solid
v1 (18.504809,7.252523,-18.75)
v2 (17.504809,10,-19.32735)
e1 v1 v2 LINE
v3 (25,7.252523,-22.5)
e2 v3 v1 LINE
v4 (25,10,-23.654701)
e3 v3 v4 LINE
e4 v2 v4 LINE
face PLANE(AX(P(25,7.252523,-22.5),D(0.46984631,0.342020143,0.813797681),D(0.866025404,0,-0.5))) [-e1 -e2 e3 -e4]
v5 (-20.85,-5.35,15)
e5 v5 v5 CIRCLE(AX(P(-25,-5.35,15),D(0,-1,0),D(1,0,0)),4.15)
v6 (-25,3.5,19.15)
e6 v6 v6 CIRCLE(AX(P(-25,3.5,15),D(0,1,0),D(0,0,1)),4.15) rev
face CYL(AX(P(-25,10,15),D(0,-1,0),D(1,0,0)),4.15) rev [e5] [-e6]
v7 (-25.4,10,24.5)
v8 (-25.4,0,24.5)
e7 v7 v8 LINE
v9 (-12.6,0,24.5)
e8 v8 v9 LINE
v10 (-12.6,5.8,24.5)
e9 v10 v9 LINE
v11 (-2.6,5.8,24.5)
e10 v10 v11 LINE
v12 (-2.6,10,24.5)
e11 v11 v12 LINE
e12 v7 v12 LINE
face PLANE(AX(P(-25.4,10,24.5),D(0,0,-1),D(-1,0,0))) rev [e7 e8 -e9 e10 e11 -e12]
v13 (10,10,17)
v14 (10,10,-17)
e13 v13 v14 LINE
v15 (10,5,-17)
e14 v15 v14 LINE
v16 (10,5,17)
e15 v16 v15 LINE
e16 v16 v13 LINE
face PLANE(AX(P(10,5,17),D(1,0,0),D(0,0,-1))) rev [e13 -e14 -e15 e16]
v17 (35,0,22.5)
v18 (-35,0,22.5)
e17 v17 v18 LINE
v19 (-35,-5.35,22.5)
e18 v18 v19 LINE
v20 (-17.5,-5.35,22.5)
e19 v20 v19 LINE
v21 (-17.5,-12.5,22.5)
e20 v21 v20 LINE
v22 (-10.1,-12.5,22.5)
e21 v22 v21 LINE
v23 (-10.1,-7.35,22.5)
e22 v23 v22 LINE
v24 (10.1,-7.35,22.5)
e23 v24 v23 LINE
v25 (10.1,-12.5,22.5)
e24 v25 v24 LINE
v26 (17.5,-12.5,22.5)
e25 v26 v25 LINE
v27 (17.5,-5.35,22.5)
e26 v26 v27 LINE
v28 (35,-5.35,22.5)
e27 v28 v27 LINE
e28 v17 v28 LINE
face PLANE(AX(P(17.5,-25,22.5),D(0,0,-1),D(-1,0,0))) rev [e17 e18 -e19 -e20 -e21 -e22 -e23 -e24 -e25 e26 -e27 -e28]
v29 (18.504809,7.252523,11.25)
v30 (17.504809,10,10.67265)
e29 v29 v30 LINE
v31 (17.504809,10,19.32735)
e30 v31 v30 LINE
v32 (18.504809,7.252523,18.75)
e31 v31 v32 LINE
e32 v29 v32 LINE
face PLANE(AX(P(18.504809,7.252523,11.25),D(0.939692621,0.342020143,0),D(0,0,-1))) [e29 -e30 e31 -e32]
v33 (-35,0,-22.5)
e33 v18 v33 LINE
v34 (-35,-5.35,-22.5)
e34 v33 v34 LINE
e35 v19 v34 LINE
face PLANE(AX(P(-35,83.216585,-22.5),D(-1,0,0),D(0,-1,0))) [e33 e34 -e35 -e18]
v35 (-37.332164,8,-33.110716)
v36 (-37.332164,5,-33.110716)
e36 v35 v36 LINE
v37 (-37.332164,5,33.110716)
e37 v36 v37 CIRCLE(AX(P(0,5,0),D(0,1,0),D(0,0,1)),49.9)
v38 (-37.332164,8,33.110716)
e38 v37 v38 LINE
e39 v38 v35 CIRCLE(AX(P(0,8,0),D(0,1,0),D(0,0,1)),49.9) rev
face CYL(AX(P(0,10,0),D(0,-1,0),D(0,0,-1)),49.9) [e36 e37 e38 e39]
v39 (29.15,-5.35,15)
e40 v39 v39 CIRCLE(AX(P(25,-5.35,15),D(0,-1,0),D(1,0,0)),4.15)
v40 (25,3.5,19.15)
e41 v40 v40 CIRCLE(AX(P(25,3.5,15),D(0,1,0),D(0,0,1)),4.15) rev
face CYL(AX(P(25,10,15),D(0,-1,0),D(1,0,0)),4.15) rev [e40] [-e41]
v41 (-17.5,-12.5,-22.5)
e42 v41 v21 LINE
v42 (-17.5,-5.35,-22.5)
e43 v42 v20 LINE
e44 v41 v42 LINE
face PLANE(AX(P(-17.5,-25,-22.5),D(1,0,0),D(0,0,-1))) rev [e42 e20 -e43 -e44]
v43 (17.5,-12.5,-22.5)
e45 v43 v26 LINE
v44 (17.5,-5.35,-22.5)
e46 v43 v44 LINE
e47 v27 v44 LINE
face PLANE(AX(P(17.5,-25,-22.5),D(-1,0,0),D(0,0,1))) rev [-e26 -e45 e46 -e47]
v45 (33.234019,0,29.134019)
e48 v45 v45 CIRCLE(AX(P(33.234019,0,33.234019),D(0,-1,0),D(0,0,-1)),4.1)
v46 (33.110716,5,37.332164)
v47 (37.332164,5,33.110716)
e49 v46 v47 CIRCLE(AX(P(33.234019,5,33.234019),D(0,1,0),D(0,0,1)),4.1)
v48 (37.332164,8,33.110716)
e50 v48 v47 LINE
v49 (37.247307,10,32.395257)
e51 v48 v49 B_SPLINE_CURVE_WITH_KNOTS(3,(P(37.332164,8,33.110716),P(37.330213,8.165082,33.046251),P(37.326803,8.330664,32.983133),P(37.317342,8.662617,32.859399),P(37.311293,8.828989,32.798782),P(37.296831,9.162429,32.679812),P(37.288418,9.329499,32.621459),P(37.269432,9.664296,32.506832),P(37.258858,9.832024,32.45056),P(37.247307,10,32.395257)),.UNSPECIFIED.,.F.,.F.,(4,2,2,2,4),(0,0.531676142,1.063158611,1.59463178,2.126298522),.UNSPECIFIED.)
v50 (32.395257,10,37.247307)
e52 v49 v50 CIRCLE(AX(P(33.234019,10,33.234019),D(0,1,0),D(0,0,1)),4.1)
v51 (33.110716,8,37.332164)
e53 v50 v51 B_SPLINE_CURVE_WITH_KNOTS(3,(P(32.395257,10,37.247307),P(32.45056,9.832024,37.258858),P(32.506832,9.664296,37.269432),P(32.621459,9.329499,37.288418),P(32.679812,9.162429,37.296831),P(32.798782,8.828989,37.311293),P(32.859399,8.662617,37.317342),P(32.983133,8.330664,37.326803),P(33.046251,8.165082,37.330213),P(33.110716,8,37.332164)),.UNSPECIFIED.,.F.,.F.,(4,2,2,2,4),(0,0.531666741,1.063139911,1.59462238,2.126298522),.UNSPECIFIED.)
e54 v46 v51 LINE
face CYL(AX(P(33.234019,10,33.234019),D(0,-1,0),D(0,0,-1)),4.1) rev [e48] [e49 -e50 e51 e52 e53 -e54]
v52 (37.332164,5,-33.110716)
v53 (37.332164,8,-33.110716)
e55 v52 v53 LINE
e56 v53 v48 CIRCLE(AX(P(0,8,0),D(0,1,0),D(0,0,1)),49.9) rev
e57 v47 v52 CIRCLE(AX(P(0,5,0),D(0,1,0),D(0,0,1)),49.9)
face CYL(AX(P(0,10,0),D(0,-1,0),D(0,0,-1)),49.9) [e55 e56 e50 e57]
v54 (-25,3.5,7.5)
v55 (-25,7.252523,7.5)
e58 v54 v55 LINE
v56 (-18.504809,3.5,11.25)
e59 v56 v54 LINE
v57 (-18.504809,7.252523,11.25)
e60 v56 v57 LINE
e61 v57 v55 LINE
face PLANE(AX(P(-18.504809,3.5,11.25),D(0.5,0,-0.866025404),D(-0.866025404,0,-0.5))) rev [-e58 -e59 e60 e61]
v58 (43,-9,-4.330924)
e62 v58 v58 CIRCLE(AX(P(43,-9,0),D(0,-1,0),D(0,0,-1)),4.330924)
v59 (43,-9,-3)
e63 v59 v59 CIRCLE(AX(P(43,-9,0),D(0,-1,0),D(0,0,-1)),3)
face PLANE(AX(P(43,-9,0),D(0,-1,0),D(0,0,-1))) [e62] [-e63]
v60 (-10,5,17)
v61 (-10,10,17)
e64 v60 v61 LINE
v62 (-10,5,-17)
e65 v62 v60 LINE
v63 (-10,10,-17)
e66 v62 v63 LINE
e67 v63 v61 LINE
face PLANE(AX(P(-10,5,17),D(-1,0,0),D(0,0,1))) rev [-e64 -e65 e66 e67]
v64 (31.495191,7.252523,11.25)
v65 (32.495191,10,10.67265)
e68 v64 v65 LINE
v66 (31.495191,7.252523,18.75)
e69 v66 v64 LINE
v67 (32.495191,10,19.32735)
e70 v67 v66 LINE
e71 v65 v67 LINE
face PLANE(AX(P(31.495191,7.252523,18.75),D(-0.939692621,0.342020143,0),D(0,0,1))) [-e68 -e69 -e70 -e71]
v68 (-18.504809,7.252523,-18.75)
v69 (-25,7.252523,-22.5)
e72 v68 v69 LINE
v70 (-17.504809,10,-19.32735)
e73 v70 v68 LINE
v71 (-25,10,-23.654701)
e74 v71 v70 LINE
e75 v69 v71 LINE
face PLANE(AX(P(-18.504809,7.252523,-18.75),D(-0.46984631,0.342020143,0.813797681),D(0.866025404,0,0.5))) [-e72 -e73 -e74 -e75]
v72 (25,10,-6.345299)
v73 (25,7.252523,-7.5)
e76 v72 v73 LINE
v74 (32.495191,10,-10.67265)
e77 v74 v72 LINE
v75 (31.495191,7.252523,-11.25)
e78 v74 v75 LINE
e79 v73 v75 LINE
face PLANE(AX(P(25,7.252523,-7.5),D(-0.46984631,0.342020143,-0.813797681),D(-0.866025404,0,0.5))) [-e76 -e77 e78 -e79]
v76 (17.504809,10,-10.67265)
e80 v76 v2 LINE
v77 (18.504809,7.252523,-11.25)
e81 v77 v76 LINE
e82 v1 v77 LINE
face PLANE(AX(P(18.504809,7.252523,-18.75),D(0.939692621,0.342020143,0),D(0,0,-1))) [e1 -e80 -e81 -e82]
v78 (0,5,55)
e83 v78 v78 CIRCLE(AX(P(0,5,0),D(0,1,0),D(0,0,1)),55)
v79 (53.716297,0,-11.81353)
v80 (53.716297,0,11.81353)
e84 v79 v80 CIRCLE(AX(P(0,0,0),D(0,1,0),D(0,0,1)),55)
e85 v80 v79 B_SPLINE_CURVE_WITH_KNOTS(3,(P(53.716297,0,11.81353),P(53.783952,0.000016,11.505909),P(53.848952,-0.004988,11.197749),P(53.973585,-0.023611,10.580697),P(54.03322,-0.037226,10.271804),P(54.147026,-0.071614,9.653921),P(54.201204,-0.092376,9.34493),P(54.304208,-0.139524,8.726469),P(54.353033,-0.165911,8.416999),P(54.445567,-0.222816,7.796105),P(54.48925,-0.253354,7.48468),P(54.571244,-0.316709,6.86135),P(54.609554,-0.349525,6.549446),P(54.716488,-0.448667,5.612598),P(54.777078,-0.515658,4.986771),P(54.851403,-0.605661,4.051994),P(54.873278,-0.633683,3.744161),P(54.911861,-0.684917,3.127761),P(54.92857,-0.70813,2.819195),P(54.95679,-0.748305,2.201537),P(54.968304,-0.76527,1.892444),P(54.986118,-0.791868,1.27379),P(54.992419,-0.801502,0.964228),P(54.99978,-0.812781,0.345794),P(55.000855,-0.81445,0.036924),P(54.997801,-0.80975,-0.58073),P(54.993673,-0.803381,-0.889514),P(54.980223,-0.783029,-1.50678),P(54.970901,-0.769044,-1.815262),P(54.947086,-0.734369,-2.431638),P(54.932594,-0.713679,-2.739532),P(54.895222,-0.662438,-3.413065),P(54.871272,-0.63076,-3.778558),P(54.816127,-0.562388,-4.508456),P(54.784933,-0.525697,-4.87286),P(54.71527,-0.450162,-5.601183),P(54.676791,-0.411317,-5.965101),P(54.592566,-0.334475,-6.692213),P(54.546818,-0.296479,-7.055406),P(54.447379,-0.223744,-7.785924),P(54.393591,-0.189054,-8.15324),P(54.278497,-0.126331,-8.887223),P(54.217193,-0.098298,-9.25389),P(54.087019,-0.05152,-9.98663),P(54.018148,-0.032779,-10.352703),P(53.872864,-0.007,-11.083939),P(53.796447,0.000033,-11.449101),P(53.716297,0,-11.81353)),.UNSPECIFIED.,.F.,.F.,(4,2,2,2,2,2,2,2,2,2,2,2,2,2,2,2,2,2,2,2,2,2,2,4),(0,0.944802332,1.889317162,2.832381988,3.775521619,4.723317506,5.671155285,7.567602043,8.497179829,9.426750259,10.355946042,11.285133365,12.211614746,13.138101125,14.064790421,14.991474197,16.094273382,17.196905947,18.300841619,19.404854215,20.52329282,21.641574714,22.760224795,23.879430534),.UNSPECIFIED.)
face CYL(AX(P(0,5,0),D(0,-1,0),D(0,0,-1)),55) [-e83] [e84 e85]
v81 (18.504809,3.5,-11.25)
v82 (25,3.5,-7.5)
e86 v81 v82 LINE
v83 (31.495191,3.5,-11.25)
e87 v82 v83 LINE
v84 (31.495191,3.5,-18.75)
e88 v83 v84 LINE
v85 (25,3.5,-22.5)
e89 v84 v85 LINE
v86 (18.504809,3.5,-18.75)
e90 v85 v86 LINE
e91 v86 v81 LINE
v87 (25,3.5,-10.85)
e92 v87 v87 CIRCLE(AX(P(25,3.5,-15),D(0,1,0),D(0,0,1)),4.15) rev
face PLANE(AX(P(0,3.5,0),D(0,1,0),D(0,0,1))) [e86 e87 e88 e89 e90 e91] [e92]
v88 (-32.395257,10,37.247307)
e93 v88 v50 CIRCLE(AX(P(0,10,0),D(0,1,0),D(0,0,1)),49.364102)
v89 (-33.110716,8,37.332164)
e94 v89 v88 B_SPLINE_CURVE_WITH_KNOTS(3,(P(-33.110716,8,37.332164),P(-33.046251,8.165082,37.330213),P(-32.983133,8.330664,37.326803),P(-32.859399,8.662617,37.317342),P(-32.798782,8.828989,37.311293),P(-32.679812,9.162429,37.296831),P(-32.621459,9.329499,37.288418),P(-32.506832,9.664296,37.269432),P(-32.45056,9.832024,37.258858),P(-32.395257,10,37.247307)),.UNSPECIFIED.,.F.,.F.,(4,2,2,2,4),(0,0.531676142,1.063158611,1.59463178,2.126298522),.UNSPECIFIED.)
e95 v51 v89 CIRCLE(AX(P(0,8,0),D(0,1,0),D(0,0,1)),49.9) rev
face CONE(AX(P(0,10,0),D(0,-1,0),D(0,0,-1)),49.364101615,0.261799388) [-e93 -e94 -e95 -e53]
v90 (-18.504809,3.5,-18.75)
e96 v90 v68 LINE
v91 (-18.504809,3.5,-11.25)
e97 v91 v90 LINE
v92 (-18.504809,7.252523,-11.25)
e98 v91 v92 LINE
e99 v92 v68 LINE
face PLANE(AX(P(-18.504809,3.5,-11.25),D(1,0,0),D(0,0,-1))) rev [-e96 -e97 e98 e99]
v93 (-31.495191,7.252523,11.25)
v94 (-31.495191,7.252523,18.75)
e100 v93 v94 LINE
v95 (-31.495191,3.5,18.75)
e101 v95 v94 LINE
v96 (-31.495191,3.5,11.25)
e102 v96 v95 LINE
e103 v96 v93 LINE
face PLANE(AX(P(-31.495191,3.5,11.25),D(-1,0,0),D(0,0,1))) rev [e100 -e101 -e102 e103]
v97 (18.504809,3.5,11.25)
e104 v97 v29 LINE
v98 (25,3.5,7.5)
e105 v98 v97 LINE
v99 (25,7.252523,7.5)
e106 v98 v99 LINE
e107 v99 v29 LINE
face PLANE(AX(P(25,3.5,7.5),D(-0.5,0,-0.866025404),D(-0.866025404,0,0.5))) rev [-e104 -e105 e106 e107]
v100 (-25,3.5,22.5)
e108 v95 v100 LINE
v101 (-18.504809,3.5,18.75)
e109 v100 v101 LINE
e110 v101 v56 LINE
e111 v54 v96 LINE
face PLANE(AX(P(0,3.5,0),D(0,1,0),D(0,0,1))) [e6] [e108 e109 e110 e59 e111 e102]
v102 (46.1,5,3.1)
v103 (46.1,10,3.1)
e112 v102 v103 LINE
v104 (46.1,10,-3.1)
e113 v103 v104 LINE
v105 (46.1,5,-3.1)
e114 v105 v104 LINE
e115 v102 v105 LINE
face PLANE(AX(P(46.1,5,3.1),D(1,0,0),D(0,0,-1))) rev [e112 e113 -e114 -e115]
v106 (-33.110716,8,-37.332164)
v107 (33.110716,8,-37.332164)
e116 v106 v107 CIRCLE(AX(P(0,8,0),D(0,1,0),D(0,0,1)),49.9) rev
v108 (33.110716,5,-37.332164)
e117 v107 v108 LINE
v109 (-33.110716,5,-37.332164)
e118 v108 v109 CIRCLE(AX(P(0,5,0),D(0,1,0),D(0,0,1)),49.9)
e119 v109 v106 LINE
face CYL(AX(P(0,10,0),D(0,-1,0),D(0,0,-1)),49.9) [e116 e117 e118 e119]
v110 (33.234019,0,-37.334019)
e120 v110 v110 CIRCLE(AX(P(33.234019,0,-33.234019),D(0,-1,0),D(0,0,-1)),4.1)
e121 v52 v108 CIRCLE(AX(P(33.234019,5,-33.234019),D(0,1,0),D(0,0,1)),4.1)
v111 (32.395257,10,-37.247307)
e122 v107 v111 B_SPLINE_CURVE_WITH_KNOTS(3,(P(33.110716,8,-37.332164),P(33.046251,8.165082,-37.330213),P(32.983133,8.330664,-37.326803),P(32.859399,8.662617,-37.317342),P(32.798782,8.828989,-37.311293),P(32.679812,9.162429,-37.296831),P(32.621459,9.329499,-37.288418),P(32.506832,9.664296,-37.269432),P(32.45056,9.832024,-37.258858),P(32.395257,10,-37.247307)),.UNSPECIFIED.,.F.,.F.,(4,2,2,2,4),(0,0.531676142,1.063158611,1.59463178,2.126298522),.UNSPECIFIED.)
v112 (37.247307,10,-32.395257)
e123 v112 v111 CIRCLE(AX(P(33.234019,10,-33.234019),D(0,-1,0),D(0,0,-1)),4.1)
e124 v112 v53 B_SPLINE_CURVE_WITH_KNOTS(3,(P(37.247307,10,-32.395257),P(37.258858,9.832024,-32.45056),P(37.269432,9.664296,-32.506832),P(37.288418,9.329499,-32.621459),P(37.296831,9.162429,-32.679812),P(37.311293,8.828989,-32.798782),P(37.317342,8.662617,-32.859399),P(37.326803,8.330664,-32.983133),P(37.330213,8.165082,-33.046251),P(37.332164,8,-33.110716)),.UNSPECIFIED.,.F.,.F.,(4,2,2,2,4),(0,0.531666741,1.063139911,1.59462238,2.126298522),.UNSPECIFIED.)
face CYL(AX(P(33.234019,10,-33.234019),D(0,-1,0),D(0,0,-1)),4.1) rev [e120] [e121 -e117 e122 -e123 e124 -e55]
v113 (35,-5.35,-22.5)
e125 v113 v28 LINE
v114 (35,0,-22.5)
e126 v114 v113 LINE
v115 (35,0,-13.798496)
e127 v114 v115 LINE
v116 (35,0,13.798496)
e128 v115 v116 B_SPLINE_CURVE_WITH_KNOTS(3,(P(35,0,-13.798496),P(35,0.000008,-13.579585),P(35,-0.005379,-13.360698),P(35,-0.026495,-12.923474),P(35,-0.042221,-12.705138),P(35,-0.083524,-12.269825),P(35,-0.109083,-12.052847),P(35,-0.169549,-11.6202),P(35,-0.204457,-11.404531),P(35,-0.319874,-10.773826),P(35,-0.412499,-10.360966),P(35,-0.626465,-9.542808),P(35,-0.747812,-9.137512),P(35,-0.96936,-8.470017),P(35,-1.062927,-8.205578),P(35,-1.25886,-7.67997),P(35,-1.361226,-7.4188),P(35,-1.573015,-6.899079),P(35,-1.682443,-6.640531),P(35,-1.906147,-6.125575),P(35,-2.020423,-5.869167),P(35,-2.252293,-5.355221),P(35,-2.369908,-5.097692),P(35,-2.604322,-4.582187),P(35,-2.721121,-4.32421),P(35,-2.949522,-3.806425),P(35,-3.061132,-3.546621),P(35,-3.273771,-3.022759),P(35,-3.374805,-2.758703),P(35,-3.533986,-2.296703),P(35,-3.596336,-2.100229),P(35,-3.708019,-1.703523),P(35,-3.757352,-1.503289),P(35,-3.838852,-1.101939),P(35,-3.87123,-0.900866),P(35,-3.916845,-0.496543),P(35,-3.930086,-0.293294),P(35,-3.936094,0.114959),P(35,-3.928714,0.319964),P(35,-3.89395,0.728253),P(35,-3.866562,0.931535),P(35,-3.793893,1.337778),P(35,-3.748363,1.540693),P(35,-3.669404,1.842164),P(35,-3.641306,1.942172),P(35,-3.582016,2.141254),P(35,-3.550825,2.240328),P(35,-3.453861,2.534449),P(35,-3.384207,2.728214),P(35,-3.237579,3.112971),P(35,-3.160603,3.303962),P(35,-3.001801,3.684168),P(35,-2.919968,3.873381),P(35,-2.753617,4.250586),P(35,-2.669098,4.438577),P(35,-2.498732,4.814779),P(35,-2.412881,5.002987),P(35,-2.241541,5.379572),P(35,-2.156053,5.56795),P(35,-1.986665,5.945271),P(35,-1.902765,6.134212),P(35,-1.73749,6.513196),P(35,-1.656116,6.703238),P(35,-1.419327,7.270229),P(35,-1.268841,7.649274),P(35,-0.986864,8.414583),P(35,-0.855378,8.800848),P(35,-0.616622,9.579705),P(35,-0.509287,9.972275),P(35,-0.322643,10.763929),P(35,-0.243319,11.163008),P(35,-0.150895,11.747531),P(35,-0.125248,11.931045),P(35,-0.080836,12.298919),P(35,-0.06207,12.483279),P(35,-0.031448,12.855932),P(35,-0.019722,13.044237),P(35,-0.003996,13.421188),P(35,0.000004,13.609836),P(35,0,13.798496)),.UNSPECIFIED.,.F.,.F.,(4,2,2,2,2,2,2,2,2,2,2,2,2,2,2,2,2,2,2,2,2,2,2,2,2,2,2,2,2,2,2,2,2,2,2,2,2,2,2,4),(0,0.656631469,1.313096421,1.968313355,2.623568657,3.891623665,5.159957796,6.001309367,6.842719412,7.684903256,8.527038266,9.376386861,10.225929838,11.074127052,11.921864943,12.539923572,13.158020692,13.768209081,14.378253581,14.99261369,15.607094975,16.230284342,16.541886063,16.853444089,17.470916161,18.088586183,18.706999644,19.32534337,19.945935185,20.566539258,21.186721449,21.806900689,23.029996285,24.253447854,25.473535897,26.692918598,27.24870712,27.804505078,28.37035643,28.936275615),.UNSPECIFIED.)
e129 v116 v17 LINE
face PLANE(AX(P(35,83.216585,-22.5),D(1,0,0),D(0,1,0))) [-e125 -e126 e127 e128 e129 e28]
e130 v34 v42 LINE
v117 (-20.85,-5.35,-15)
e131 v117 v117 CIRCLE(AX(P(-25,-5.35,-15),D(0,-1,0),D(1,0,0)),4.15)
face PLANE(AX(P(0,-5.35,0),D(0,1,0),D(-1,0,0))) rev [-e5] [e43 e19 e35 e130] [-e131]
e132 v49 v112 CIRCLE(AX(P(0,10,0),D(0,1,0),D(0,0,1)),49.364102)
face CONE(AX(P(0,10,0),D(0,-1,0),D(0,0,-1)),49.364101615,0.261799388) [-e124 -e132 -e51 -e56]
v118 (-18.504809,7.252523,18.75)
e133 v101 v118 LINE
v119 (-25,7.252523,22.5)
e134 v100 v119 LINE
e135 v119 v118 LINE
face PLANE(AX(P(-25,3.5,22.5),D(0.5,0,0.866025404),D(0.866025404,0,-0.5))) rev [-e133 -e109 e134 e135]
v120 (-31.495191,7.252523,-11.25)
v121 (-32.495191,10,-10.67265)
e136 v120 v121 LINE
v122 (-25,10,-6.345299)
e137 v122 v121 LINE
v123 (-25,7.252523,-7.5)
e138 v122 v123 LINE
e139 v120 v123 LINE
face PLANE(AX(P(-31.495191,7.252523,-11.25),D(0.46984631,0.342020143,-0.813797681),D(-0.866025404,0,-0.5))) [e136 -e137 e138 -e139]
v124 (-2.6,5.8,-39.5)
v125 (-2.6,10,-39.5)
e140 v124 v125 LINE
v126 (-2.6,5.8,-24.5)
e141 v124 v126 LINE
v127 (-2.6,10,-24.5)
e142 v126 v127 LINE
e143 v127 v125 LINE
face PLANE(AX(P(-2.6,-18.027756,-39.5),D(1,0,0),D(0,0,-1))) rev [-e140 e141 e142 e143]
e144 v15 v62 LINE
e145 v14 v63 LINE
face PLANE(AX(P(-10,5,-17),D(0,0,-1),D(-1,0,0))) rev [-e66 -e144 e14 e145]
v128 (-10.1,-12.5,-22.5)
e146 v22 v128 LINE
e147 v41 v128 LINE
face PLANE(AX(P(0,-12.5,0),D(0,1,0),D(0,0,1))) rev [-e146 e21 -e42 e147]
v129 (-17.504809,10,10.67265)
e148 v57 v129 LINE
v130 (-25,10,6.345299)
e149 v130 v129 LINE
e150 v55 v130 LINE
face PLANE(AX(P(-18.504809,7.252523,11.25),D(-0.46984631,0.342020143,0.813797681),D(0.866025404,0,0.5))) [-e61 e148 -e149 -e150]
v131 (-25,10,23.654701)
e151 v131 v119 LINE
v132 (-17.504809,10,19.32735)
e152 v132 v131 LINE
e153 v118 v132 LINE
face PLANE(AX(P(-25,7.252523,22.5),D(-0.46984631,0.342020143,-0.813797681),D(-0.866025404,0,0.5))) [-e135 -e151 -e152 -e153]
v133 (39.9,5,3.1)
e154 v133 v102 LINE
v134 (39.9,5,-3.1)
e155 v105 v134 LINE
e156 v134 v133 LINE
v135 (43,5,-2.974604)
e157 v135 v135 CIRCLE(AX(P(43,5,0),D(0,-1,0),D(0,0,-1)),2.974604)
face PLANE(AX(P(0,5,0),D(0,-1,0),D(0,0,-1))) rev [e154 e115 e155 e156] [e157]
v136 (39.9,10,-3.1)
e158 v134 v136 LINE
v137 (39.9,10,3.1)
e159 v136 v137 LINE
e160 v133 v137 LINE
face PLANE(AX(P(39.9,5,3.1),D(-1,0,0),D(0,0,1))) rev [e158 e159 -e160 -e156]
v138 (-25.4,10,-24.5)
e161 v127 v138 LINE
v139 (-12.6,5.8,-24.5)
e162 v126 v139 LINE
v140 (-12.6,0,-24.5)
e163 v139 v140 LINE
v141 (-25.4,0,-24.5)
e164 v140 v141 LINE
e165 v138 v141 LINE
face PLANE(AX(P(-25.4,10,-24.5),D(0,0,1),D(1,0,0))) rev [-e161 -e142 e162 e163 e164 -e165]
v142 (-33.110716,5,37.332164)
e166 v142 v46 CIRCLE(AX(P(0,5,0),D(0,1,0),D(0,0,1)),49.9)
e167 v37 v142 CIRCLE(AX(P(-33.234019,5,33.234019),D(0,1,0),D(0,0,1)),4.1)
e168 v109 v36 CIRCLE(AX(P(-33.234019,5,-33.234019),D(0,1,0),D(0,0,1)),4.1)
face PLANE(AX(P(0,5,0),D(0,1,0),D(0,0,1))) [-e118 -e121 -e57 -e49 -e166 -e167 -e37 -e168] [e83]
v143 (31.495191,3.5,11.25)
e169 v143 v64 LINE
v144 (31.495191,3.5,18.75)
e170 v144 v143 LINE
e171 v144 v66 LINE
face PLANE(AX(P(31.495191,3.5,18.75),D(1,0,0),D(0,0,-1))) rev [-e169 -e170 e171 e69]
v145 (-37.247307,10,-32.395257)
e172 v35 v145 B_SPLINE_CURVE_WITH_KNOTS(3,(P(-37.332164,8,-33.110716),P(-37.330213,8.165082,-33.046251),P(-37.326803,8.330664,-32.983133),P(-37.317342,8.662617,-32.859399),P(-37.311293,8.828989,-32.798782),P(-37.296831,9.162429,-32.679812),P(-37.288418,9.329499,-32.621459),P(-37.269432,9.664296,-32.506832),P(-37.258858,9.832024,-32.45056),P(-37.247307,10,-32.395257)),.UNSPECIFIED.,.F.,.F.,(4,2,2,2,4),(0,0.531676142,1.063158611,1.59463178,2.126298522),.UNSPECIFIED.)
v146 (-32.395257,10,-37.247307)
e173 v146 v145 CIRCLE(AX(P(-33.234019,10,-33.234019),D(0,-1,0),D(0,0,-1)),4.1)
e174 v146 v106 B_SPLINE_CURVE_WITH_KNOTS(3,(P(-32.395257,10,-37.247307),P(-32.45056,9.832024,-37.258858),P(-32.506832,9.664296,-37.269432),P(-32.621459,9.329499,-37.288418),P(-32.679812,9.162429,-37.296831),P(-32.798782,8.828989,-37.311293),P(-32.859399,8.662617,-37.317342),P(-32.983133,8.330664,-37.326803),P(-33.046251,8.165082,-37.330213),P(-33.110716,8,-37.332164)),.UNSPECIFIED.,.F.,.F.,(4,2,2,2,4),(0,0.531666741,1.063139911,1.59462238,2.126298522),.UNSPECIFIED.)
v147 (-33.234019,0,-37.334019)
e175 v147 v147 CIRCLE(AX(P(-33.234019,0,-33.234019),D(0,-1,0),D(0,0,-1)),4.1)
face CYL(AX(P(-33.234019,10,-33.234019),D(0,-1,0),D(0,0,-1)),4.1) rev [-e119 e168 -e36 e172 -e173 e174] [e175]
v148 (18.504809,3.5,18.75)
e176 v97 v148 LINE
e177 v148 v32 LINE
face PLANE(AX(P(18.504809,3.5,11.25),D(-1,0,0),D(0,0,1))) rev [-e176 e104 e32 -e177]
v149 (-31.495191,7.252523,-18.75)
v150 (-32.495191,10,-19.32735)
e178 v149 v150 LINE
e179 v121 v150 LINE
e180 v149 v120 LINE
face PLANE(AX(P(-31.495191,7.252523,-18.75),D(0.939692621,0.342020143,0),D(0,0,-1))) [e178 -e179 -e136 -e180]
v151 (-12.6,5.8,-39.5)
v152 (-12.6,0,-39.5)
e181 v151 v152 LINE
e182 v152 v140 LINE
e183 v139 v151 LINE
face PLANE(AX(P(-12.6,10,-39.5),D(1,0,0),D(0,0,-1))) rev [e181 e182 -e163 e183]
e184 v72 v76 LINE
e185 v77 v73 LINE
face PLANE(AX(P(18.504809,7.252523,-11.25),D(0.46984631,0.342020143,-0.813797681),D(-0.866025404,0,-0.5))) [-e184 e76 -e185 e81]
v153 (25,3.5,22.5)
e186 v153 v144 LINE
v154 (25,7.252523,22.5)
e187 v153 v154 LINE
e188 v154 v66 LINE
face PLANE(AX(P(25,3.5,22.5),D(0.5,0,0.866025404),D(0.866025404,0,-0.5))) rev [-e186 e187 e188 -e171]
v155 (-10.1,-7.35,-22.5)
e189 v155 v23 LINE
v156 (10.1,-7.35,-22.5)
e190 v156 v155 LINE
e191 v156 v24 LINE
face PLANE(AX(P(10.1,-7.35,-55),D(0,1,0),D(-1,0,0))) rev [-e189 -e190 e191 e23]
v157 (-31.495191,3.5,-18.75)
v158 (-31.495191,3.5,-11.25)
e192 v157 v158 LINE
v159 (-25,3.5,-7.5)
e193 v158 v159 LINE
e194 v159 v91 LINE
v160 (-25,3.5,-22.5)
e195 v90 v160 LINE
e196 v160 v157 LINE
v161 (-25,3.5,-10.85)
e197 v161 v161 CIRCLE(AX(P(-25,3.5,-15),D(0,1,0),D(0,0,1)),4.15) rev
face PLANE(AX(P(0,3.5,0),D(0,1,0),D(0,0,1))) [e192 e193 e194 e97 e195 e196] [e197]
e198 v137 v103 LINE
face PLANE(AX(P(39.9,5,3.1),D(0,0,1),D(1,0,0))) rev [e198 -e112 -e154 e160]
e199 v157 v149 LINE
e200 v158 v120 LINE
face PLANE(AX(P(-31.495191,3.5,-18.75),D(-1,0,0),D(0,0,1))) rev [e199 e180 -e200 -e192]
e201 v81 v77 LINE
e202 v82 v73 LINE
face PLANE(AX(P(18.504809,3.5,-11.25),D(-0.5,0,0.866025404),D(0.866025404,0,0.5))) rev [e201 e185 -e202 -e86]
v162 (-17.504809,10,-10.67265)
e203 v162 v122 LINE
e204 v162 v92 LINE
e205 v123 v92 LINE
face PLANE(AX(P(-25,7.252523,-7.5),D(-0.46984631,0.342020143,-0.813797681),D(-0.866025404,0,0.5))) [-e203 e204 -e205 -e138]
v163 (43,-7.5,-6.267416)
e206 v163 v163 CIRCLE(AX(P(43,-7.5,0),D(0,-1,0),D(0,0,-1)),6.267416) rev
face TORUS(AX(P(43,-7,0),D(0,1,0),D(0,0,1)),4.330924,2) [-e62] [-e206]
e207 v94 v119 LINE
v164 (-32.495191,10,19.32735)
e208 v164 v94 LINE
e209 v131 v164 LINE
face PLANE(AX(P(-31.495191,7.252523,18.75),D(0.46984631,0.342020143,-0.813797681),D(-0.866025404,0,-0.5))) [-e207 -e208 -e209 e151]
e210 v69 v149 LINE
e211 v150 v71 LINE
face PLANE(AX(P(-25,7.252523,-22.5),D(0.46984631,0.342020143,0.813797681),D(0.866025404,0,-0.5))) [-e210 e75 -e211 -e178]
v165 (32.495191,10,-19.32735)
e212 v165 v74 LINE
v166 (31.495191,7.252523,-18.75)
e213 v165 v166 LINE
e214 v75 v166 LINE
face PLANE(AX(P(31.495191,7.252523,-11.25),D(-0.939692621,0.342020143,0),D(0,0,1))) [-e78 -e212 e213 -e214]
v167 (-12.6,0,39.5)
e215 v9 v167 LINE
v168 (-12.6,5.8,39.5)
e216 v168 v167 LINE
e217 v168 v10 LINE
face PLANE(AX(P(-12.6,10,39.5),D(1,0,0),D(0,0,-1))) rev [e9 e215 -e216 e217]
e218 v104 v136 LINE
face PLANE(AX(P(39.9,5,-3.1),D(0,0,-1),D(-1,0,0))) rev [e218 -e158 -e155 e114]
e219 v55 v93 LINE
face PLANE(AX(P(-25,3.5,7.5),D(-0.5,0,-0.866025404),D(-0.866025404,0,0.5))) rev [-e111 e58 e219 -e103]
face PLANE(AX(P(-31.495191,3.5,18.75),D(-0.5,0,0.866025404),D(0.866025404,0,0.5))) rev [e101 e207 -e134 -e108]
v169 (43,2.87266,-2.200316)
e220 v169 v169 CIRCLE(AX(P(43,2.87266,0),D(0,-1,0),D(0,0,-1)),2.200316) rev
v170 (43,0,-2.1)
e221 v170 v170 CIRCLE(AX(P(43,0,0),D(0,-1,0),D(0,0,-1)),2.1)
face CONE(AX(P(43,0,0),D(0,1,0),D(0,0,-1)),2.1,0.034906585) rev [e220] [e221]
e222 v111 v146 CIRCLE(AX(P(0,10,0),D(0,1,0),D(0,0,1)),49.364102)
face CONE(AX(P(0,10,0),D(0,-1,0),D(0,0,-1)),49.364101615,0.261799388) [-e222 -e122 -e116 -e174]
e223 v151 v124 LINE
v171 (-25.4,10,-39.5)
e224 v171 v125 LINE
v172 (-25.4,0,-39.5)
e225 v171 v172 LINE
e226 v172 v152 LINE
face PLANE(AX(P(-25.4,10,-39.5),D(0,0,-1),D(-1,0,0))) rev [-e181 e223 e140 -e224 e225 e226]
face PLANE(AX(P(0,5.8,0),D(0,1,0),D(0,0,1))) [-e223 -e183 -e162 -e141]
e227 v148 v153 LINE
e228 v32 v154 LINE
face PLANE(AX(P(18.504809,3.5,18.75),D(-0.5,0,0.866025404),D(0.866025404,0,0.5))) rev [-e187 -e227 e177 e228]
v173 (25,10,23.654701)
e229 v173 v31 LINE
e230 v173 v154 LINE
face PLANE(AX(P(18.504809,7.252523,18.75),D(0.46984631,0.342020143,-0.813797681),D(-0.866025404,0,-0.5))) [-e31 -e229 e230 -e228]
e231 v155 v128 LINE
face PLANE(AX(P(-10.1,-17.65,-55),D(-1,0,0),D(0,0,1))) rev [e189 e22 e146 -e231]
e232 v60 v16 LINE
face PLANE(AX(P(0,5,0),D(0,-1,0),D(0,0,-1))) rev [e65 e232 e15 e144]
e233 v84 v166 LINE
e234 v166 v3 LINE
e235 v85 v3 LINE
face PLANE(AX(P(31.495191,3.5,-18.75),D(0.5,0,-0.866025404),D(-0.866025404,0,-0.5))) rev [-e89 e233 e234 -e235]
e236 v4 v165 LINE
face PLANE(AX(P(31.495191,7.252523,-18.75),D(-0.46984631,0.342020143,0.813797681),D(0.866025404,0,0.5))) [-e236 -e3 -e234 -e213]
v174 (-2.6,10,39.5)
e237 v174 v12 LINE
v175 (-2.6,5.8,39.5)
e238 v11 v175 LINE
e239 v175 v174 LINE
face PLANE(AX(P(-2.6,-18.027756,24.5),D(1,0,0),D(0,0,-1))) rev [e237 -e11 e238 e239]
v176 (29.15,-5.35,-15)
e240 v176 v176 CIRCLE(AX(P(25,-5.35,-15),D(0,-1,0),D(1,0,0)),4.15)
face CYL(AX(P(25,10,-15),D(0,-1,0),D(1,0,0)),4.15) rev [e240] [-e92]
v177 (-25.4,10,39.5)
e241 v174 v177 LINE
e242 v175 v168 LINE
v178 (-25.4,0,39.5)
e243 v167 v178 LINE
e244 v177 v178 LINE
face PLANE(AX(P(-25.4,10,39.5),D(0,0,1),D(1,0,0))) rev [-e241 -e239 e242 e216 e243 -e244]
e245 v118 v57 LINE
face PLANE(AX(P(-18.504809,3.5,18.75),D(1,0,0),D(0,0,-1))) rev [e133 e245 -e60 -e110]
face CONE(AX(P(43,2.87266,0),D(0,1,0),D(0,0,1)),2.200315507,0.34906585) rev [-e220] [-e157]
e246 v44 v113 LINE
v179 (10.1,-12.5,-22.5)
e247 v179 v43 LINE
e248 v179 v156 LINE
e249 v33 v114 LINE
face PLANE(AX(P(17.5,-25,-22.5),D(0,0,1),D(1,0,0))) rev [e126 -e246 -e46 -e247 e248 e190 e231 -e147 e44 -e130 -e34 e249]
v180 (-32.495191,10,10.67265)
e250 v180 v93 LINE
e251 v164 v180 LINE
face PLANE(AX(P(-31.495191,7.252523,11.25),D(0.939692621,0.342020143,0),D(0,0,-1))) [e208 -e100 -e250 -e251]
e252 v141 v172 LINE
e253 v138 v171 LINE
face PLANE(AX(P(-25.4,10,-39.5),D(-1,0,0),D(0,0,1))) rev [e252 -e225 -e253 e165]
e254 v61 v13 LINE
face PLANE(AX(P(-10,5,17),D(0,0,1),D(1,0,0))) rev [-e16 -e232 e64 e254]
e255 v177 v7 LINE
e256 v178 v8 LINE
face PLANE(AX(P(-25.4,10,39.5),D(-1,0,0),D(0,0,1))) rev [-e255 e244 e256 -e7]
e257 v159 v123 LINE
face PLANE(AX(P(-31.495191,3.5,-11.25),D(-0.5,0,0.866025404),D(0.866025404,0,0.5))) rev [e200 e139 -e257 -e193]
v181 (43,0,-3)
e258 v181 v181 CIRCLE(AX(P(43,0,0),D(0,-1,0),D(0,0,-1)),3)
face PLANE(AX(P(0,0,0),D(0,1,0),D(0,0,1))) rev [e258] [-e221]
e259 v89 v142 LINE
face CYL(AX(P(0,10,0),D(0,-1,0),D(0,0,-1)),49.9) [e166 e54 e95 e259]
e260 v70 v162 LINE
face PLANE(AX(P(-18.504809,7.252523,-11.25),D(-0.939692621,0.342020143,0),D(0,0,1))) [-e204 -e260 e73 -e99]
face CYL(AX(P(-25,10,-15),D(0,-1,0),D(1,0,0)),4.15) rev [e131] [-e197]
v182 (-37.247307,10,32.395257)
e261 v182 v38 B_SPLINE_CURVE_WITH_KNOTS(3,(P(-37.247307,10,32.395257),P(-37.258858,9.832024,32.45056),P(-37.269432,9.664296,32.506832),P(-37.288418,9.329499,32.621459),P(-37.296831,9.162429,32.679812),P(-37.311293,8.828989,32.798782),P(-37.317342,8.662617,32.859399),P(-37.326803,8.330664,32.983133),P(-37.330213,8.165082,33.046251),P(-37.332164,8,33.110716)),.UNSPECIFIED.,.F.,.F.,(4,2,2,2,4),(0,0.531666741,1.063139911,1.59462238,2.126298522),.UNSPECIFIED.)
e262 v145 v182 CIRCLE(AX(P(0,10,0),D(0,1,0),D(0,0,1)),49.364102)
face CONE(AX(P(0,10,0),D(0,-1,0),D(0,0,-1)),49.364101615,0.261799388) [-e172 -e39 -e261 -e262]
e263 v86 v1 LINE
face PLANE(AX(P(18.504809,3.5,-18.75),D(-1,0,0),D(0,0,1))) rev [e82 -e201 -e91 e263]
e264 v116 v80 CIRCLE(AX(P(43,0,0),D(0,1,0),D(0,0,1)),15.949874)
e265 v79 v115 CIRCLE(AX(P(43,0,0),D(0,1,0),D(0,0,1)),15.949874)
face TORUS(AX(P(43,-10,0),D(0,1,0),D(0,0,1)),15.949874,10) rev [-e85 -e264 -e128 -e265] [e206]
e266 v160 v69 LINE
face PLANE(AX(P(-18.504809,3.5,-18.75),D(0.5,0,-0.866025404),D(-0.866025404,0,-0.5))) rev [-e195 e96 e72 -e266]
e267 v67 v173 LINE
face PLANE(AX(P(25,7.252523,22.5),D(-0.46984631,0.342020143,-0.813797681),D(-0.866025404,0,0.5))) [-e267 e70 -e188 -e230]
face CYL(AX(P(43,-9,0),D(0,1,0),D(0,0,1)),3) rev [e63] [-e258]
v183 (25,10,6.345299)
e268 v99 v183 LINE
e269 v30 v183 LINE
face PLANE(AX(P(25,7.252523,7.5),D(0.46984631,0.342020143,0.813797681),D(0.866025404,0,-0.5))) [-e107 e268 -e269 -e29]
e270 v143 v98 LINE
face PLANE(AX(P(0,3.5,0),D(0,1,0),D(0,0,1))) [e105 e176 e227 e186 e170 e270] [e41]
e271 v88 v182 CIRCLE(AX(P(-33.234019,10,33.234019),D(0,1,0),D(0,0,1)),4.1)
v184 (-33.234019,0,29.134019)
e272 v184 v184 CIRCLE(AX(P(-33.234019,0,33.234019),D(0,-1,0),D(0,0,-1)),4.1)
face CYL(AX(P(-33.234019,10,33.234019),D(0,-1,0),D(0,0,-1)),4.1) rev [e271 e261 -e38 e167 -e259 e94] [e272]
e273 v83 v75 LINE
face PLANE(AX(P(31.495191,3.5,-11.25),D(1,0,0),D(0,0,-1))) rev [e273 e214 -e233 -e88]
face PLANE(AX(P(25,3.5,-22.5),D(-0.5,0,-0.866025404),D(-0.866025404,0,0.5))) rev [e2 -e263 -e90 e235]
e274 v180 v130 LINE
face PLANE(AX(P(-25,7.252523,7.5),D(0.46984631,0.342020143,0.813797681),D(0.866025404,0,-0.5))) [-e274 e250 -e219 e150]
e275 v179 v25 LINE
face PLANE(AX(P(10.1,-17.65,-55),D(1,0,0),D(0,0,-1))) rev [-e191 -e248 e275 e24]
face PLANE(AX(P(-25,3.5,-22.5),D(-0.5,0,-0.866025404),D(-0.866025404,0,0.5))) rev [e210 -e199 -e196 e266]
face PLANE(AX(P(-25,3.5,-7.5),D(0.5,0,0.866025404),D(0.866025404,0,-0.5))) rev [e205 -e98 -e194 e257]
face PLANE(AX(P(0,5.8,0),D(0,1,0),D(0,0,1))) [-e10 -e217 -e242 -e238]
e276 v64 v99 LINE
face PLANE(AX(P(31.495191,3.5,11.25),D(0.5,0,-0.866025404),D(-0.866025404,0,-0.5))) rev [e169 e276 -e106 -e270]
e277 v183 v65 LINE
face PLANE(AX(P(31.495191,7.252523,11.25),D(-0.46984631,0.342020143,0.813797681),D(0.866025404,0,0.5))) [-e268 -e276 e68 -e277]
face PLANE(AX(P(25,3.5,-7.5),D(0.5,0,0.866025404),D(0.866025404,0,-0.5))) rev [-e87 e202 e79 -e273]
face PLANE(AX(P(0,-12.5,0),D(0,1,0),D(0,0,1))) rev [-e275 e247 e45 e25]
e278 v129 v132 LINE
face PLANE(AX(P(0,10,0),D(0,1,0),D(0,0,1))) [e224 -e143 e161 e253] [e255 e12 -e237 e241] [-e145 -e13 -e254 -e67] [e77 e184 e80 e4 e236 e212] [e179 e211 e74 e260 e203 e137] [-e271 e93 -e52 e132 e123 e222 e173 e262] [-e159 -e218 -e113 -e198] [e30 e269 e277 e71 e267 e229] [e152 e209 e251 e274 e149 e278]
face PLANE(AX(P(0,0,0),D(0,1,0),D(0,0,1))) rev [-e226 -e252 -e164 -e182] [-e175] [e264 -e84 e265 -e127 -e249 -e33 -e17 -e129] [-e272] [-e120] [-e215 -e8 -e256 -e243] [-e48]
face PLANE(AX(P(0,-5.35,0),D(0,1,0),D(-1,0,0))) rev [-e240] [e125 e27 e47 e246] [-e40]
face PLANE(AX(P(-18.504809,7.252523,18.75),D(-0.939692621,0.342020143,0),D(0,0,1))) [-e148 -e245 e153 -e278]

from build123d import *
from OCP.BRepFilletAPI import BRepFilletAPI_MakeChamfer

# Parameters (mm, degrees)
SKETCH_1_R          = 55
EXTRUDE_1_DEPTH     = 5
SKETCH_2_R          = 49.9
EXTRUDE_2_DEPTH     = 5
SKETCH_3_W          = 35
SKETCH_3_H          = 45
EXTRUDE_3_DEPTH     = 25
SKETCH_4_W          = 20.2
SKETCH_4_H          = 10.3
CUT_EXTRUDE_1_DEPTH = 99.266220035
SKETCH_5_R          = 4.1
CUT_EXTRUDE_2_DEPTH = 82.700673192
SKETCH_6_R          = 2.75
CUT_EXTRUDE_3_DEPTH = 86.293610546
CHAMFER1_SIZE       = 2
CHAMFER1_SIZE2      = 0.535898385
SKETCH2_W           = 35.065209797
SKETCH2_H           = 45
CUT_EXTRUDE1_DEPTH  = 12.5
BOSS_EXTRUDE1_START = -2
SKETCH4_W           = 70
SKETCH4_H           = 45
BOSS_EXTRUDE1_DEPTH = 5.35
SKETCH5_R           = 4.15
CUT_EXTRUDE2_DEPTH  = 80.281917882
CUT_EXTRUDE3_DEPTH  = 6.5
SKETCH7_W           = 20
SKETCH7_H           = 34
CUT_EXTRUDE4_DEPTH  = 5
CHAMFER2_SIZE       = 1
CHAMFER2_SIZE2      = 2.747477419
SKETCH8_R           = 2.1
CUT_EXTRUDE5_DEPTH  = 79.779756283
CUT_EXTRUDE5_DRAFT  = 2
SKETCH9_W           = 6.2
SKETCH9_H           = 6.2
CUT_EXTRUDE6_DEPTH  = 5
CHAMFER3_SIZE       = 0.7
CHAMFER3_SIZE2      = 2.128636439
SKETCH10_R          = 6
SKETCH10_R_2        = 3
BOSS_EXTRUDE2_DEPTH = 9
FILLET1_R           = 10
FILLET2_R           = 2
SKETCH11_W          = 12.8
SKETCH11_H          = 15
CUT_EXTRUDE7_DEPTH  = 79.779756353
SKETCH13_W          = 10
SKETCH13_H          = 15
CUT_EXTRUDE8_DEPTH  = 4.2


with BuildPart() as part:
    # Эскиз1 → Бобышка-Вытянуть1 (new body)
    with BuildSketch(Plane(origin=(0, 0, 0), x_dir=(1, 0, 0), z_dir=(0, 1, 0))):
        with Locations(Location((0, 0, 0), (0, 0, 270))):
            Circle(SKETCH_1_R)
    extrude(amount=EXTRUDE_1_DEPTH)

    # Эскиз2 → Бобышка-Вытянуть2 (add)
    with BuildSketch(Plane(origin=(0, 5, 0), x_dir=(1, 0, 0), z_dir=(0, 1, 0))):
        with Locations(Location((0, 0, 0), (0, 0, 270))):
            Circle(SKETCH_2_R)
    extrude(amount=EXTRUDE_2_DEPTH)

    # Эскиз3 → Бобышка-Вытянуть3 (add)
    with BuildSketch(Plane.XZ):
        Rectangle(SKETCH_3_W, SKETCH_3_H)
    extrude(amount=EXTRUDE_3_DEPTH)

    # Эскиз4 → Вырез-Вытянуть1 (cut, through all)
    with BuildSketch(Plane.XY.offset(22.5)):
        with Locations((0, -12.5)):
            Rectangle(SKETCH_4_W, SKETCH_4_H)
    extrude(amount=-CUT_EXTRUDE_1_DEPTH, mode=Mode.SUBTRACT)

    # Эскиз5 → Вырез-Вытянуть2 (cut, through all)
    with BuildSketch(Plane.XZ):
        with Locations(Location((33.234018718, -33.234018718, 0), (0, 0, 270))):
            Circle(SKETCH_5_R)
        with Locations(Location((-33.234018718, -33.234018718, 0), (0, 0, 270))):
            Circle(SKETCH_5_R)
        with Locations(Location((-33.234018718, 33.234018718, 0), (0, 0, 270))):
            Circle(SKETCH_5_R)
        with Locations(Location((33.234018718, 33.234018718, 0), (0, 0, 270))):
            Circle(SKETCH_5_R)
    extrude(amount=-CUT_EXTRUDE_2_DEPTH, mode=Mode.SUBTRACT)

    # Эскиз6 → Вырез-Вытянуть3 (cut, through all)
    with BuildSketch(Plane(origin=(0, 10, 0), x_dir=(1, 0, 0), z_dir=(0, 1, 0))):
        with Locations(Location((-18, 28, 0), (0, 0, 270))):
            Circle(SKETCH_6_R)
    extrude(amount=-CUT_EXTRUDE_3_DEPTH, mode=Mode.SUBTRACT)

    # Chamfer1: one chamfer whose edges measure the first distance from different faces: ONE call of the kernel's chamfer builder (chamfer() names one face for all edges)
    chamfer1_edges_1 = [part.edges().sort_by_distance(p)[0] for p in [
        (0, 10, -49.9),
    ]]
    chamfer1_side_1 = [part.faces().sort_by_distance(p)[0] for p in [
        (0, 7.5, -49.9),
    ]]
    chamfer1_edges_2 = [part.edges().sort_by_distance(p)[0] for p in [
        (-49.9, 10, 0),
    ]]
    chamfer1_side_2 = [part.faces().sort_by_distance(p)[0] for p in [
        (-49.9, 7.5, 0),
    ]]
    chamfer1_edges_3 = [part.edges().sort_by_distance(p)[0] for p in [
        (0, 10, 49.9),
    ]]
    chamfer1_side_3 = [part.faces().sort_by_distance(p)[0] for p in [
        (0, 7.5, 49.9),
    ]]
    chamfer1_edges_4 = [part.edges().sort_by_distance(p)[0] for p in [
        (49.9, 10, 0),
    ]]
    chamfer1_side_4 = [part.faces().sort_by_distance(p)[0] for p in [
        (49.9, 7.5, 0),
    ]]
    chamfer1 = BRepFilletAPI_MakeChamfer(part.part.solid().wrapped)
    for e in chamfer1_edges_1:
        chamfer1.Add(CHAMFER1_SIZE, CHAMFER1_SIZE2, e.wrapped, chamfer1_side_1[0].wrapped)  # the first distance lies on this face
    for e in chamfer1_edges_2:
        chamfer1.Add(CHAMFER1_SIZE, CHAMFER1_SIZE2, e.wrapped, chamfer1_side_2[0].wrapped)  # the first distance lies on this face
    for e in chamfer1_edges_3:
        chamfer1.Add(CHAMFER1_SIZE, CHAMFER1_SIZE2, e.wrapped, chamfer1_side_3[0].wrapped)  # the first distance lies on this face
    for e in chamfer1_edges_4:
        chamfer1.Add(CHAMFER1_SIZE, CHAMFER1_SIZE2, e.wrapped, chamfer1_side_4[0].wrapped)  # the first distance lies on this face
    add(Compound.cast(chamfer1.Shape()), mode=Mode.REPLACE)

    # Sketch2 → Cut-Extrude1 (cut)
    with BuildSketch(Plane.XZ.offset(25)):
        with Locations((-0.032604899, 0)):
            Rectangle(SKETCH2_W, SKETCH2_H)
    extrude(amount=-CUT_EXTRUDE1_DEPTH, mode=Mode.SUBTRACT)

    # Sketch4 → Boss-Extrude1 (add)
    with BuildSketch(Plane.XZ.offset(7.35).offset(BOSS_EXTRUDE1_START)):
        Rectangle(SKETCH4_W, SKETCH4_H)
    extrude(amount=-BOSS_EXTRUDE1_DEPTH)

    # Sketch5 → Cut-Extrude2 (cut, through all)
    with BuildSketch(Plane.XZ.offset(5.35)):
        with Locations((25, 15)):
            Circle(SKETCH5_R)
        with Locations((-25, 15)):
            Circle(SKETCH5_R)
        with Locations((25, -15)):
            Circle(SKETCH5_R)
        with Locations((-25, -15)):
            Circle(SKETCH5_R)
    extrude(amount=-CUT_EXTRUDE2_DEPTH, mode=Mode.SUBTRACT)

    # Sketch6 → Cut-Extrude3 (cut)
    with BuildSketch(Plane(origin=(0, 10, 0), x_dir=(1, 0, 0), z_dir=(0, 1, 0))):
        Polygon((-18.504809472, -11.25), (-25, -7.5), (-31.495190528, -11.25), (-31.495190528, -18.75), (-25, -22.5), (-18.504809472, -18.75), align=None)
        Polygon((31.495190528, -11.25), (25, -7.5), (18.504809472, -11.25), (18.504809472, -18.75), (25, -22.5), (31.495190528, -18.75), align=None)
        Polygon((31.495190528, 18.75), (25, 22.5), (18.504809472, 18.75), (18.504809472, 11.25), (25, 7.5), (31.495190528, 11.25), align=None)
        Polygon((-18.504809472, 18.75), (-25, 22.5), (-31.495190528, 18.75), (-31.495190528, 11.25), (-25, 7.5), (-18.504809472, 11.25), align=None)
    extrude(amount=-CUT_EXTRUDE3_DEPTH, mode=Mode.SUBTRACT)

    # Sketch7 → Cut-Extrude4 (cut)
    with BuildSketch(Plane(origin=(0, 10, 0), x_dir=(1, 0, 0), z_dir=(0, 1, 0))):
        Rectangle(SKETCH7_W, SKETCH7_H)
    extrude(amount=-CUT_EXTRUDE4_DEPTH, mode=Mode.SUBTRACT)

    # Chamfer2
    chamfer2_edges = [part.edges().sort_by_distance(p)[0] for p in [
        (-18.504809472, 10, 15),
        (-21.752404736, 10, 9.375),
        (-28.247595264, 10, 9.375),
        (-31.495190528, 10, 15),
        (-28.247595264, 10, 20.625),
        (-21.752404736, 10, 20.625),
        (31.495190528, 10, 15),
        (28.247595264, 10, 9.375),
        (21.752404736, 10, 9.375),
        (18.504809472, 10, 15),
        (21.752404736, 10, 20.625),
        (28.247595264, 10, 20.625),
        (31.495190528, 10, -15),
        (28.247595264, 10, -20.625),
        (21.752404736, 10, -20.625),
        (18.504809472, 10, -15),
        (21.752404736, 10, -9.375),
        (28.247595264, 10, -9.375),
        (-18.504809472, 10, -15),
        (-21.752404736, 10, -20.625),
        (-28.247595264, 10, -20.625),
        (-31.495190528, 10, -15),
        (-28.247595264, 10, -9.375),
        (-21.752404736, 10, -9.375),
    ]]
    chamfer2_side = [part.faces().sort_by_distance(p)[0] for p in [
        (-27.766928677, 10, 32.668824287),
    ]]
    chamfer(chamfer2_edges, length=CHAMFER2_SIZE, length2=CHAMFER2_SIZE2, reference=chamfer2_side[0])


with BuildPart() as cut_extrude5_tool:
    # Sketch8 → Cut-Extrude5 (with draft: the straight prism first)
    with BuildSketch(Plane.XZ):
        with Locations((43, 0)):
            Circle(SKETCH8_R)
    extrude(amount=-CUT_EXTRUDE5_DEPTH)
    # Cut-Extrude5: the draft: its side faces are tilted about the plane it starts from
    cut_extrude5_sides = [cut_extrude5_tool.faces().sort_by_distance(p)[0] for p in [
        (40.9, 39.889878141, 0),
    ]]
    draft(cut_extrude5_sides, Plane.XZ, CUT_EXTRUDE5_DRAFT)


with BuildPart() as part_1:
    add(part.part)

    # Cut-Extrude5: cut by cut_extrude5_tool
    add(cut_extrude5_tool.part, mode=Mode.SUBTRACT)

    # Sketch9 → Cut-Extrude6 (cut)
    with BuildSketch(Plane(origin=(0, 10, 0), x_dir=(1, 0, 0), z_dir=(0, 1, 0))):
        with Locations((43, 0)):
            Rectangle(SKETCH9_W, SKETCH9_H)
    extrude(amount=-CUT_EXTRUDE6_DEPTH, mode=Mode.SUBTRACT)

    # Chamfer3
    chamfer3_edges = [part_1.edges().sort_by_distance(p)[0] for p in [
        (40.725396153, 5, 0),
    ]]
    chamfer3_side = [part_1.faces().sort_by_distance(p)[0] for p in [
        (43, 5, 3.012318759),
    ]]
    chamfer(chamfer3_edges, length=CHAMFER3_SIZE, length2=CHAMFER3_SIZE2, reference=chamfer3_side[0])

    # Sketch10 → Boss-Extrude2 (add)
    with BuildSketch(Plane.XZ):
        with Locations(Location((43, 0, 0), (0, 0, 90))):
            Circle(SKETCH10_R)
        with Locations(Location((43, 0, 0), (0, 0, 270))):
            Circle(SKETCH10_R_2, mode=Mode.SUBTRACT)
    extrude(amount=BOSS_EXTRUDE2_DEPTH)

    # Fillet1
    # the kernel refuses this fillet: 10 mm, written as the material it adds along each edge
    with BuildSketch(Plane(origin=(43, 0, 0), x_dir=(0, 0, 1), z_dir=(1, 0, 0))) as fillet1_piece_1_section:
        with BuildLine():
            CenterArc((15.949874371, 10), FILLET1_R, 185.739170477, 84.260829523)
            Line((6, 9), (5.801002513, 8.98))
            ThreePointArc((5.801002513, 8.98), (5.8, 4.5), (5.8, 0))
            Line((5.8, 0), (6, -0.2))
            Line((6, -0.2), (15.949874371, -0.2))
            Line((15.949874371, -0.2), (15.949874371, 0))
        make_face()
    fillet1_piece_1 = revolve(axis=Axis((43, 0, 0), (0, -1, 0)), mode=Mode.PRIVATE)
    fillet1_piece_1 = fillet1_piece_1 & Plane(origin=(0, -2.503571207, 0), x_dir=(0, 0, 1), z_dir=(0, -1, 0)) * Cylinder(55, 64, mode=Mode.PRIVATE)
    add(fillet1_piece_1)

    # Fillet2
    fillet2_edges = [part_1.edges().sort_by_distance(p)[0] for p in [
        (43, -9, -6),
    ]]
    fillet(fillet2_edges, radius=FILLET2_R)

    # Sketch11 → Cut-Extrude7 (cut, through all)
    with BuildSketch(Plane.XZ):
        with Locations((-19, -32)):
            Rectangle(SKETCH11_W, SKETCH11_H)
        with Locations((-19, 32)):
            Rectangle(SKETCH11_W, SKETCH11_H)
    extrude(amount=-CUT_EXTRUDE7_DEPTH, mode=Mode.SUBTRACT)

    # Sketch13 → Cut-Extrude8 (cut)
    with BuildSketch(Plane(origin=(0, 10, 0), x_dir=(1, 0, 0), z_dir=(0, 1, 0))):
        with Locations((-7.6, 32)):
            Rectangle(SKETCH13_W, SKETCH13_H)
        with Locations((-7.6, -32)):
            Rectangle(SKETCH13_W, SKETCH13_H)
    extrude(amount=-CUT_EXTRUDE8_DEPTH, mode=Mode.SUBTRACT)


solid = part_1.part
